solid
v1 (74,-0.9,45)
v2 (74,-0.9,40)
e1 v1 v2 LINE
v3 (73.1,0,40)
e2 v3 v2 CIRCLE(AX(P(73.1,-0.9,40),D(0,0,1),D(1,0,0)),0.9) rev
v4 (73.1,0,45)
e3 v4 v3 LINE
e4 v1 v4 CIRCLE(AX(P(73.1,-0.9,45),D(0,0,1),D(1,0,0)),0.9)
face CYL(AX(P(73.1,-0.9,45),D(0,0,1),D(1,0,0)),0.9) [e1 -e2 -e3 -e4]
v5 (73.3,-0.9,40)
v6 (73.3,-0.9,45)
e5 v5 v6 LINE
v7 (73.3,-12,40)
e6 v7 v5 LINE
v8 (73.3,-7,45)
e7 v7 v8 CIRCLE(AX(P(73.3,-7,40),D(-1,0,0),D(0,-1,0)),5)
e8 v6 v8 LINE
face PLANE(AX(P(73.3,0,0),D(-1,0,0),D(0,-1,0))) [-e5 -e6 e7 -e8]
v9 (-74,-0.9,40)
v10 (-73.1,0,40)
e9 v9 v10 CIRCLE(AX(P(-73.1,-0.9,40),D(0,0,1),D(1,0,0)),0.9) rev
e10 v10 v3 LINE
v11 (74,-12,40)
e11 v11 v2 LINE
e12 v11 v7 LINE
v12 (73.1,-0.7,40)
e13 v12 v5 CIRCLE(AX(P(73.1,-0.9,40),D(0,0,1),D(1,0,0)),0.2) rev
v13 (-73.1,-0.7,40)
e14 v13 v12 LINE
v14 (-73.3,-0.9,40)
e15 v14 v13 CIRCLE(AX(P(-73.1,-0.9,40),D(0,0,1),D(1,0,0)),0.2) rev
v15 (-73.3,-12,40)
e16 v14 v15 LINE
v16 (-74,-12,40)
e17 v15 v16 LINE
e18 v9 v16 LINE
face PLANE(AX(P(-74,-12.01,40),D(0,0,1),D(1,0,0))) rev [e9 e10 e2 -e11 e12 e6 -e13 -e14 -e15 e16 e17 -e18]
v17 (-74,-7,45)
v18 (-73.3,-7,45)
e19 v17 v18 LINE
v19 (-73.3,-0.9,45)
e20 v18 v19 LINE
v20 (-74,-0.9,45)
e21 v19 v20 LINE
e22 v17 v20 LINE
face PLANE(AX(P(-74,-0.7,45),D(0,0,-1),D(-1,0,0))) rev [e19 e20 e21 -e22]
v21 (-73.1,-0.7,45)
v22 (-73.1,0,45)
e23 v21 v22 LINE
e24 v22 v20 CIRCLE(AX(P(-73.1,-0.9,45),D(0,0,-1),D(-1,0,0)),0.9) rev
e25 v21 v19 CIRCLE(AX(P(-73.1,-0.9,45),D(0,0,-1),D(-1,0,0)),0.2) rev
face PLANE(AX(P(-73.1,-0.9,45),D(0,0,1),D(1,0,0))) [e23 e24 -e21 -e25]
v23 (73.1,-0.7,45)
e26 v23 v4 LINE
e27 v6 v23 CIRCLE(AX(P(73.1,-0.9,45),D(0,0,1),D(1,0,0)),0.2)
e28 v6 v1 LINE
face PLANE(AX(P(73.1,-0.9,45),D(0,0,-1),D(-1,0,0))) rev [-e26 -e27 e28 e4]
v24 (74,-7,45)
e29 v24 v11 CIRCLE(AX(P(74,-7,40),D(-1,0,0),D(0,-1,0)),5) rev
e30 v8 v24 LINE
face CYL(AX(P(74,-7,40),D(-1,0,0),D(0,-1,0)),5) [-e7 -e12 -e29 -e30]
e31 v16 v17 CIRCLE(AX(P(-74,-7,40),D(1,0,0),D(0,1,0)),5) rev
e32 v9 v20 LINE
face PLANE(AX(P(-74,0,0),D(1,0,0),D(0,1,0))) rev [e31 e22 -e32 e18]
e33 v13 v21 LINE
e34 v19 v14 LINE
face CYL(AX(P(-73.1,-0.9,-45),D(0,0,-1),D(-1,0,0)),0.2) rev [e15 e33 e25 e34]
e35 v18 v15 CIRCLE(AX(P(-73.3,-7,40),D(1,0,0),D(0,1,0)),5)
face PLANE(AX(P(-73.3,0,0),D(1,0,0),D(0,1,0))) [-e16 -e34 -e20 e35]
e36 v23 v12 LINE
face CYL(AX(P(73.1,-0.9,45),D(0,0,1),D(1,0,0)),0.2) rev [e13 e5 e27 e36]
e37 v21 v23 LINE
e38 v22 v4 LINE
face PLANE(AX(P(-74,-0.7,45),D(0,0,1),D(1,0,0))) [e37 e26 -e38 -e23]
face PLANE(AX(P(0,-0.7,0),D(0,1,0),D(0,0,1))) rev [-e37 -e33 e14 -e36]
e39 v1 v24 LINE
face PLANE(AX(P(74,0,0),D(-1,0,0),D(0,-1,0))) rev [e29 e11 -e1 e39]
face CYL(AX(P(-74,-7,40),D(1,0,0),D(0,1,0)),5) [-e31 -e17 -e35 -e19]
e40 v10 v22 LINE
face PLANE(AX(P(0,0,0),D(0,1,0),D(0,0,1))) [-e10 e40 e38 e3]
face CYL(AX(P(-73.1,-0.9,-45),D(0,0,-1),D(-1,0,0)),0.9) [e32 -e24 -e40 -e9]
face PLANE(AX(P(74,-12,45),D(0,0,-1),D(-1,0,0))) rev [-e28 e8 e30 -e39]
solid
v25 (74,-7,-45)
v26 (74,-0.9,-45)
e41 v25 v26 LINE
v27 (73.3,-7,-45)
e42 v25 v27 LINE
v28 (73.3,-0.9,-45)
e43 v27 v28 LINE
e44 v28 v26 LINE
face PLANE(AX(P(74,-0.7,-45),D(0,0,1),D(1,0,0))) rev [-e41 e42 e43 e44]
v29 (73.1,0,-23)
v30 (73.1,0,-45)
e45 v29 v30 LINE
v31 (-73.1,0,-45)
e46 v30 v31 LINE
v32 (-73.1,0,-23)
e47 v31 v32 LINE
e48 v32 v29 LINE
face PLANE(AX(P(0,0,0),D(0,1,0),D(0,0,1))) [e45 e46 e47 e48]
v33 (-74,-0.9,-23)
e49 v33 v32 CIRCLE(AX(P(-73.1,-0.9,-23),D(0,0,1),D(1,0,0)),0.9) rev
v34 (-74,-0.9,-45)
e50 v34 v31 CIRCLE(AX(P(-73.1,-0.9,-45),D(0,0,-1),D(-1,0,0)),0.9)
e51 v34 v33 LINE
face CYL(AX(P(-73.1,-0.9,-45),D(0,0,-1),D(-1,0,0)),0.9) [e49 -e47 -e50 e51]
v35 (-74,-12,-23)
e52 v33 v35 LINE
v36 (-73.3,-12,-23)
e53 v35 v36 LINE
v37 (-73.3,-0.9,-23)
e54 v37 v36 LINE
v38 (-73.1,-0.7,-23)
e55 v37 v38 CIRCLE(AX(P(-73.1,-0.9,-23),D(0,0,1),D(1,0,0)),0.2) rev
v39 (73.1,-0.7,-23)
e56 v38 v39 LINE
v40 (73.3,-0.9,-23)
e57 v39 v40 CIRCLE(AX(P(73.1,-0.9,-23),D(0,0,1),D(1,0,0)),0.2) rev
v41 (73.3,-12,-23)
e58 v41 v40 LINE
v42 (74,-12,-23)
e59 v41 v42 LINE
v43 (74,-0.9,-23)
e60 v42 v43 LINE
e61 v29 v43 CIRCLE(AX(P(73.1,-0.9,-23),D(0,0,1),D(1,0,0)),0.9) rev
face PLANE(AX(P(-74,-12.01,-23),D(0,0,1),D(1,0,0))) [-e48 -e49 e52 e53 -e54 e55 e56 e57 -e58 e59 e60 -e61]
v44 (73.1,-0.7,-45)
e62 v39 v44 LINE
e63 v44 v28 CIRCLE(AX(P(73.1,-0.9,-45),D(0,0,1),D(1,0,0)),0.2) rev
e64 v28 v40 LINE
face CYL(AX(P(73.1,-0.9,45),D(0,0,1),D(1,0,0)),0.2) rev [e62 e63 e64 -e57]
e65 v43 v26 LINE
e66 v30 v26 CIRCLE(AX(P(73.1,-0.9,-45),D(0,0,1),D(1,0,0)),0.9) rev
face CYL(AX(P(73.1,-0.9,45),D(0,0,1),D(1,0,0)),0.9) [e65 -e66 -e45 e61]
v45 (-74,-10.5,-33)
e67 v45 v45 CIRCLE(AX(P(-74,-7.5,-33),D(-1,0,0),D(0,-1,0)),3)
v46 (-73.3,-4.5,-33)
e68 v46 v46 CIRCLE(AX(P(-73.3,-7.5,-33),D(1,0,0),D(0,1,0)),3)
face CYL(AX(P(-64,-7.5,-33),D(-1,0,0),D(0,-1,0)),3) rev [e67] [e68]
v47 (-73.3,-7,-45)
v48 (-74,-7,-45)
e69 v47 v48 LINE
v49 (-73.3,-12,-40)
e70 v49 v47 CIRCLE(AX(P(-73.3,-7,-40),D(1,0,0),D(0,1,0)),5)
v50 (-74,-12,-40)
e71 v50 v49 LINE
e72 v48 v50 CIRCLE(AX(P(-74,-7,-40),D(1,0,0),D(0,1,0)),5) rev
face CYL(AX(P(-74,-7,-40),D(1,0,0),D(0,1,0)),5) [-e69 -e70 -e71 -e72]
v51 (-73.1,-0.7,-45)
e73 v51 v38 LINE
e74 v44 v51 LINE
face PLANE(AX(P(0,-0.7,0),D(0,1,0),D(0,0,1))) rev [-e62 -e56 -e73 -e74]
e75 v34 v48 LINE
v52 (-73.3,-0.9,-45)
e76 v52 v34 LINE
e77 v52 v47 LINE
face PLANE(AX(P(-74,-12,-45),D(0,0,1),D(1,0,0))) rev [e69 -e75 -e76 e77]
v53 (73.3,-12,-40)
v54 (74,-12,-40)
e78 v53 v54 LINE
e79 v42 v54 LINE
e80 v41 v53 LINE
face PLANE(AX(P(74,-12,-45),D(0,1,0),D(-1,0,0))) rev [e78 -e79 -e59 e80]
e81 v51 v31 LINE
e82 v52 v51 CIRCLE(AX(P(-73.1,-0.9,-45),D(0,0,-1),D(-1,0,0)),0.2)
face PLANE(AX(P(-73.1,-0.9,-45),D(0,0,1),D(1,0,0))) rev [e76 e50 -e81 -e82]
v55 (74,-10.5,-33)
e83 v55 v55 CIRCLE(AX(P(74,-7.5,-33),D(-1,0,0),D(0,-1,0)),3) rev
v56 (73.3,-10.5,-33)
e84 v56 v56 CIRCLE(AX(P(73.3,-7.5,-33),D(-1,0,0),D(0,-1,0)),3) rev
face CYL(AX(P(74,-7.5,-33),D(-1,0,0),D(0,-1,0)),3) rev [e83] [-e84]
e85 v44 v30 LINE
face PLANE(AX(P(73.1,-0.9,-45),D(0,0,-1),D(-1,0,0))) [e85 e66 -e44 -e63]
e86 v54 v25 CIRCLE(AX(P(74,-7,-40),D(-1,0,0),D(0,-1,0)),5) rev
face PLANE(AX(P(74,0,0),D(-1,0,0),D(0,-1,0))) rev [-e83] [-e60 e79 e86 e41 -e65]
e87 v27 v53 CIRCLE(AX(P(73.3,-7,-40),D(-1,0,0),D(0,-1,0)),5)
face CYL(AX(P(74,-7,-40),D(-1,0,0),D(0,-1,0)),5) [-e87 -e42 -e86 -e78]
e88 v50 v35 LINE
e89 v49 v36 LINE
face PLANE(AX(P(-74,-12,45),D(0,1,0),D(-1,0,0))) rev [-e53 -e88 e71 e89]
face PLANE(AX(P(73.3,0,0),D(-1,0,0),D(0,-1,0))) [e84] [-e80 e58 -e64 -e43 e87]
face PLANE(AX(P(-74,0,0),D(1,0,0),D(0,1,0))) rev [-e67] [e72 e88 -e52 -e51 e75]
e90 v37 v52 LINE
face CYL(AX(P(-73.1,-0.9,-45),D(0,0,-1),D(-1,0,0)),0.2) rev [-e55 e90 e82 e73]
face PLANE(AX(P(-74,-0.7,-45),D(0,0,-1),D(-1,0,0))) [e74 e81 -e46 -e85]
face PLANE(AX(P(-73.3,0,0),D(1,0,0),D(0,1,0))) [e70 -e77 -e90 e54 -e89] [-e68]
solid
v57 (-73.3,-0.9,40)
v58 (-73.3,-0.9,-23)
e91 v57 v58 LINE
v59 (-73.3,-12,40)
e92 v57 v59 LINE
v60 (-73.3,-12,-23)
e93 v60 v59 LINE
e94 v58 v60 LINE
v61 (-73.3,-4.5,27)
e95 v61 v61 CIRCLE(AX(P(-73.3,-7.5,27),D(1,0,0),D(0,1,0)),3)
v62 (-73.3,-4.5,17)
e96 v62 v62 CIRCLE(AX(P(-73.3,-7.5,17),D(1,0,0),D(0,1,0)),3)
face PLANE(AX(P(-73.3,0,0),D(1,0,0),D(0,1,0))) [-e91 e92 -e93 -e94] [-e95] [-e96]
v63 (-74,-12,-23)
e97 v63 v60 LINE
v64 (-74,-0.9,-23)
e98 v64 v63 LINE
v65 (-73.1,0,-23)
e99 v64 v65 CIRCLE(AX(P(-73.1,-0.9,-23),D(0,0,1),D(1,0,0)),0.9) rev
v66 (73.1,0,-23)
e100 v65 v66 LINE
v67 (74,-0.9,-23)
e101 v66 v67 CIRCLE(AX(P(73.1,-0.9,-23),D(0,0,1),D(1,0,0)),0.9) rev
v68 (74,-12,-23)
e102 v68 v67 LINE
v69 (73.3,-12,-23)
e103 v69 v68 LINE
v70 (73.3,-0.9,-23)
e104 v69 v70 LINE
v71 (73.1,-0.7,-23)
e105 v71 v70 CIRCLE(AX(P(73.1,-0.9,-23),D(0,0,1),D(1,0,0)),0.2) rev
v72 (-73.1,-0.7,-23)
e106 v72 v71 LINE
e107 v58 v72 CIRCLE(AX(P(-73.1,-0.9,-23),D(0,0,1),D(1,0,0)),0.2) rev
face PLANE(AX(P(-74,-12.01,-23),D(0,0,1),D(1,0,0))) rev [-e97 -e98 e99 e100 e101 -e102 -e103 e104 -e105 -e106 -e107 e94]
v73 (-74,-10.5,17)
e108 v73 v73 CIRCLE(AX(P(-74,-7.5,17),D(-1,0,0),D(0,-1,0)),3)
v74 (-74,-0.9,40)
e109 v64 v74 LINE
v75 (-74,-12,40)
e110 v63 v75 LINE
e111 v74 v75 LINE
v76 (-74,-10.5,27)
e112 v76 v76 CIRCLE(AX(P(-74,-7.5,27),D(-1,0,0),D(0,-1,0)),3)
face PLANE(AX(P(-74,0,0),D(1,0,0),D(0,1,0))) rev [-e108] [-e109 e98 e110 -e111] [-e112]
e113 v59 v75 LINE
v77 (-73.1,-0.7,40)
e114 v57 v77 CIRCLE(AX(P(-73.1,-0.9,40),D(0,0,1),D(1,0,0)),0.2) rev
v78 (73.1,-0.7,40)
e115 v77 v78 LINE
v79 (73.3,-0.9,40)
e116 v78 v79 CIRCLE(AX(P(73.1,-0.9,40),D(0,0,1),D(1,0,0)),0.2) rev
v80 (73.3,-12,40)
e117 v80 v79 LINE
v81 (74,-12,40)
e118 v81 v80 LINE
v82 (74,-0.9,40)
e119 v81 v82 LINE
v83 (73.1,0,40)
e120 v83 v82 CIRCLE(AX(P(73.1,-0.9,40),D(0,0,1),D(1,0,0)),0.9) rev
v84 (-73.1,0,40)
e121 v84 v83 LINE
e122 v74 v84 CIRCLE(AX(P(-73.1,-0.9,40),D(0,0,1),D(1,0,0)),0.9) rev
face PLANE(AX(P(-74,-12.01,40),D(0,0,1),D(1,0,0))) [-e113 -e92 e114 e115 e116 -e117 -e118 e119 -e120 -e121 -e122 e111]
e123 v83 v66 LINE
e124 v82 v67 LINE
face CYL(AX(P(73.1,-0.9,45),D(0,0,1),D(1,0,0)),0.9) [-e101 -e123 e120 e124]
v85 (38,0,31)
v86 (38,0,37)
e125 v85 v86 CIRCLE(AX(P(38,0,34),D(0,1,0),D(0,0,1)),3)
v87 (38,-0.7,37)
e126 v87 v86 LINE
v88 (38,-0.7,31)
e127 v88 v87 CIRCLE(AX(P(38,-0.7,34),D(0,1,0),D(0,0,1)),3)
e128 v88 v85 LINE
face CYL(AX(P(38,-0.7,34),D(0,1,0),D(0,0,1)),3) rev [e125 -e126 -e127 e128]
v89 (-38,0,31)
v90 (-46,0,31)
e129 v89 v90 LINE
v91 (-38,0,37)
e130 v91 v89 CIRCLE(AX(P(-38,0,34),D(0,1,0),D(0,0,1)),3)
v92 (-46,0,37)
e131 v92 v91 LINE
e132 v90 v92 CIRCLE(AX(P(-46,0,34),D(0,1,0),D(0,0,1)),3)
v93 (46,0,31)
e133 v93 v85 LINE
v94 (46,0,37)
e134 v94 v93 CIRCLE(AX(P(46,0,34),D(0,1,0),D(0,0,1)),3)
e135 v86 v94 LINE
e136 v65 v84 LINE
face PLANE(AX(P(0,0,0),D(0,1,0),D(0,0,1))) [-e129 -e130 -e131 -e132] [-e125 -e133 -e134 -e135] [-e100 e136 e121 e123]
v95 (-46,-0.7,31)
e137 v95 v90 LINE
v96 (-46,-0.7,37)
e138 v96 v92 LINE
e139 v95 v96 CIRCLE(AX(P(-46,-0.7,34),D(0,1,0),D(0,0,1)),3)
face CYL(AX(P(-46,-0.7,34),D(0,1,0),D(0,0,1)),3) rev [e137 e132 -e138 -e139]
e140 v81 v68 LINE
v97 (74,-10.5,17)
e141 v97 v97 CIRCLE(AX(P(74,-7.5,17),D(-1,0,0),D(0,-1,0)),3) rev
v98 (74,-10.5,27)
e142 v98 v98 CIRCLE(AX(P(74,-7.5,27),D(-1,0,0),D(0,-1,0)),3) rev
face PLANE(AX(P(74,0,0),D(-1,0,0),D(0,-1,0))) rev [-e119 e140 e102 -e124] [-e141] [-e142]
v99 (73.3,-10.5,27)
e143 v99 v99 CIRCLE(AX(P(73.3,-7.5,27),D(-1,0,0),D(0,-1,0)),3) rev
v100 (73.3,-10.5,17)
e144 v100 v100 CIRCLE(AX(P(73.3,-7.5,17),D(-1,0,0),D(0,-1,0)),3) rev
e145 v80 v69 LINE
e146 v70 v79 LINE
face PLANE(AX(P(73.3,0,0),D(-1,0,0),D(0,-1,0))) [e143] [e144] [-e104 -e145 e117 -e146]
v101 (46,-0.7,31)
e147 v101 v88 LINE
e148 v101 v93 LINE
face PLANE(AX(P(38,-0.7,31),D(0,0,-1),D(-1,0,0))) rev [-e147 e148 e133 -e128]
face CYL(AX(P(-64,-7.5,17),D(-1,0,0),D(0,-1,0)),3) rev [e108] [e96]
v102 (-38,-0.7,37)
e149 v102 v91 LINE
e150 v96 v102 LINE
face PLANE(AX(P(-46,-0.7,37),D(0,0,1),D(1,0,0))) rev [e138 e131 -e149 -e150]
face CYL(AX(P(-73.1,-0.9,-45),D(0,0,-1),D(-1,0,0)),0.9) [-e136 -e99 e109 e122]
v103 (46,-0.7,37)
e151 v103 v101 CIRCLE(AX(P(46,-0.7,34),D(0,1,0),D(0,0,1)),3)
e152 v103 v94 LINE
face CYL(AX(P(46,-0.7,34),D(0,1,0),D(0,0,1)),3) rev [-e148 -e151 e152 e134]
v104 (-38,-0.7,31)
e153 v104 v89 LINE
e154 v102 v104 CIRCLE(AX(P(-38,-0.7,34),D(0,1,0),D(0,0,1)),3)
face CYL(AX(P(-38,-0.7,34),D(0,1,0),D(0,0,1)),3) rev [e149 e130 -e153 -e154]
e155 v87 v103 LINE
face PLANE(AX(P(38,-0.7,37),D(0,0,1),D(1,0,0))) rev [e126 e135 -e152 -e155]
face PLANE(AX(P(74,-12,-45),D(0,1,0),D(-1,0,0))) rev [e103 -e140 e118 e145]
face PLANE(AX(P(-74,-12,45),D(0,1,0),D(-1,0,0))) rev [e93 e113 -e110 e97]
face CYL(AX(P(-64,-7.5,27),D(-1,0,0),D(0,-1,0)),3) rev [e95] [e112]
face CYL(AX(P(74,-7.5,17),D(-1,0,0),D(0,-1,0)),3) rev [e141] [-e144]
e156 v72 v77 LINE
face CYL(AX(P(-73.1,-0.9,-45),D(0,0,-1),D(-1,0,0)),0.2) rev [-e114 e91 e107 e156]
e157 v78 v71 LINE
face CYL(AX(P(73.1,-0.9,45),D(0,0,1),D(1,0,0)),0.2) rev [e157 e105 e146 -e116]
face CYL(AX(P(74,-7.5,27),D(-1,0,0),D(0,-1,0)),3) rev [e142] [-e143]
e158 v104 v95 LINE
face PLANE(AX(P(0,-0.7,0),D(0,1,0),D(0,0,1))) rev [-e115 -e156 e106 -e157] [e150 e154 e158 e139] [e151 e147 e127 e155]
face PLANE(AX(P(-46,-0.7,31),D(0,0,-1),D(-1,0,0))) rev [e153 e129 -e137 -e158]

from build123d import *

# Parameters (mm, degrees)
SKETCH_1_W                         = 148
SKETCH_1_H                         = 90
SM_BASE_FLANGE_1_DEPTH             = 0.7
SM_EDGE_FLANGE_1_STRIP_W           = 3.2
SM_EDGE_FLANGE_1_STRIP_H           = 0.7
SM_EDGE_FLANGE_1_STRIP_CUT_DEPTH   = 90
SM_EDGE_FLANGE_1_STRIP_2_W         = 3.2
SM_EDGE_FLANGE_1_STRIP_2_H         = 0.7
SM_EDGE_FLANGE_1_STRIP_CUT_2_DEPTH = 90
SM_EDGE_FLANGE_1_DEPTH             = 90
SM_EDGE_FLANGE_1_PROFILE_W         = 90
SM_EDGE_FLANGE_1_PROFILE_H         = 11.1
SM_EDGE_FLANGE_1_PROFILE_R         = 3
SM_EDGE_FLANGE_1_FLAT_DEPTH        = 0.7
SM_EDGE_FLANGE_1_BEND_DEPTH        = 90
FILLET_2_R                         = 5
CUT_EXTRUDE_START                  = -10
SKETCH_15_R                        = 3
CUT_EXTRUDE_1_DEPTH                = 10
SPLIT_BODIES_1_SURFACE_1_1_BACK    = 174.632
SPLIT_BODIES_1_SURFACE_1_1_DEPTH   = 349.264
SPLIT_BODIES_1_SURFACE_1_2_BACK    = 174.632
SPLIT_BODIES_1_SURFACE_1_2_DEPTH   = 349.264
SPLIT_BODIES_1_SURFACE_2_3_BACK    = 174.632
SPLIT_BODIES_1_SURFACE_2_3_DEPTH   = 349.264
SPLIT_BODIES_1_SURFACE_2_4_BACK    = 174.632
SPLIT_BODIES_1_SURFACE_2_4_DEPTH   = 349.264


# Sheet-metal steps are written as plain solids
with BuildPart() as part:
    # Sketch 1 → 基体-法兰1 (new body)
    with BuildSketch(Plane(origin=(0, 0, 0), x_dir=(1, 0, 0), z_dir=(0, 1, 0))):
        Rectangle(SKETCH_1_W, SKETCH_1_H)
        with BuildLine():
            Line((-46, -31), (-38, -31))
            ThreePointArc((-38, -31), (-35, -34), (-38, -37))
            Line((-38, -37), (-46, -37))
            ThreePointArc((-46, -37), (-49, -34), (-46, -31))
        make_face(mode=Mode.SUBTRACT)
        with BuildLine():
            Line((38, -31), (46, -31))
            ThreePointArc((46, -31), (49, -34), (46, -37))
            Line((46, -37), (38, -37))
            ThreePointArc((38, -37), (35, -34), (38, -31))
        make_face(mode=Mode.SUBTRACT)
    extrude(amount=-SM_BASE_FLANGE_1_DEPTH)

    # 边线-法兰1 strip (across the edge) → 边线-法兰1 strip cut (cut)
    with BuildSketch(Plane(origin=(74, -0.7, -45), x_dir=(-1, 0, 0), z_dir=(0, 0, 1))):
        with Locations((-0.7, -0.35)):
            Rectangle(SM_EDGE_FLANGE_1_STRIP_W, SM_EDGE_FLANGE_1_STRIP_H)
    extrude(amount=SM_EDGE_FLANGE_1_STRIP_CUT_DEPTH, mode=Mode.SUBTRACT)

    # 边线-法兰1 strip 2 (across the edge) → 边线-法兰1 strip cut 2 (cut)
    with BuildSketch(Plane(origin=(-74, -0.7, 45), x_dir=(1, 0, 0), z_dir=(0, 0, -1))):
        with Locations((-0.7, -0.35)):
            Rectangle(SM_EDGE_FLANGE_1_STRIP_2_W, SM_EDGE_FLANGE_1_STRIP_2_H)
    extrude(amount=SM_EDGE_FLANGE_1_STRIP_CUT_2_DEPTH, mode=Mode.SUBTRACT)

    # 边线-法兰1 bend section (across the edge) → 边线-法兰1 (add)
    with BuildSketch(Plane(origin=(74, -0.7, -45), x_dir=(-1, 0, 0), z_dir=(0, 0, 1))):
        with BuildLine():
            Line((0, 0.2), (0.7, 0.2))
            ThreePointArc((0.7, 0.2), (0.758578644, 0.058578644), (0.9, 0))
            Line((0.9, 0), (0.9, -0.7))
            ThreePointArc((0.9, -0.7), (0.263603897, -0.436396103), (0, 0.2))
        make_face()
    extrude(amount=SM_EDGE_FLANGE_1_DEPTH)

    # 边线-法兰1 profile (on flange) → 边线-法兰1 flat (add)
    with BuildSketch(Plane(origin=(74, -0.7, 0), x_dir=(0, 0, 1), z_dir=(1, 0, 0))):
        with Locations((0, 5.75)):
            Rectangle(SM_EDGE_FLANGE_1_PROFILE_W, SM_EDGE_FLANGE_1_PROFILE_H)
        with Locations((17, 6.8)):
            Circle(SM_EDGE_FLANGE_1_PROFILE_R, mode=Mode.SUBTRACT)
        with Locations((27, 6.8)):
            Circle(SM_EDGE_FLANGE_1_PROFILE_R, mode=Mode.SUBTRACT)
        with Locations((-33, 6.8)):
            Circle(SM_EDGE_FLANGE_1_PROFILE_R, mode=Mode.SUBTRACT)
    extrude(amount=-SM_EDGE_FLANGE_1_FLAT_DEPTH)

    # 边线-法兰1 section (across the edge) → 边线-法兰1 bend (add)
    with BuildSketch(Plane(origin=(-74, -0.7, 45), x_dir=(1, 0, 0), z_dir=(0, 0, -1))):
        with BuildLine():
            Line((0, 0.2), (0, 11.3))
            Line((0, 11.3), (0.7, 11.3))
            Line((0.7, 11.3), (0.7, 0.2))
            ThreePointArc((0.7, 0.2), (0.758578644, 0.058578644), (0.9, 0))
            Line((0.9, 0), (0.9, -0.7))
            ThreePointArc((0.9, -0.7), (0.263603897, -0.436396103), (0, 0.2))
        make_face()
    extrude(amount=SM_EDGE_FLANGE_1_BEND_DEPTH)

    # 圆角2
    fillet_2_edges = [part.edges().sort_by_distance(p)[0] for p in [
        (-73.65, -12, 45),
        (-73.65, -12, -45),
        (73.65, -12, -45),
        (73.65, -12, 45),
    ]]
    fillet(fillet_2_edges, radius=FILLET_2_R)

    # 草图15 → 切除-拉伸1 (cut)
    with BuildSketch(Plane.ZY.offset(74).offset(CUT_EXTRUDE_START)):
        with Locations(Location((-33, -7.5, 0), (0, 0, 270))):
            Circle(SKETCH_15_R)
        with Locations(Location((17, -7.5, 0), (0, 0, 270))):
            Circle(SKETCH_15_R)
        with Locations(Location((27, -7.5, 0), (0, 0, 270))):
            Circle(SKETCH_15_R)
    extrude(amount=CUT_EXTRUDE_1_DEPTH, mode=Mode.SUBTRACT)


with BuildPart() as body_2:
    # Split Bodies 1: the piece behind the surface
    add(part.part)
    # Split Bodies 1 surface 1: a surface, the sketch's curves swept straight by 349.264 mm
    with BuildLine(Plane(origin=(0, 0, 0), x_dir=(1, 0, 0), z_dir=(0, 1, 0)).offset(-SPLIT_BODIES_1_SURFACE_1_1_BACK), mode=Mode.PRIVATE) as split_bodies_1_surface_1_1_path:
        Line((-74, 23), (74, 23))
    split_bodies_1_surface_1_1 = Shell.extrude(split_bodies_1_surface_1_1_path.wire(), (0 * SPLIT_BODIES_1_SURFACE_1_1_DEPTH, 1 * SPLIT_BODIES_1_SURFACE_1_1_DEPTH, 0 * SPLIT_BODIES_1_SURFACE_1_1_DEPTH))
    split(bisect_by=split_bodies_1_surface_1_1, keep=Keep.BOTTOM)


with BuildPart() as part_1:
    add(part.part)

    # Split Bodies 1: split by a surface, the side it looks to stays
    # Split Bodies 1 surface 1: a surface, the sketch's curves swept straight by 349.264 mm
    with BuildLine(Plane(origin=(0, 0, 0), x_dir=(1, 0, 0), z_dir=(0, 1, 0)).offset(-SPLIT_BODIES_1_SURFACE_1_2_BACK), mode=Mode.PRIVATE) as split_bodies_1_surface_1_2_path:
        Line((-74, 23), (74, 23))
    split_bodies_1_surface_1_2 = Shell.extrude(split_bodies_1_surface_1_2_path.wire(), (0 * SPLIT_BODIES_1_SURFACE_1_2_DEPTH, 1 * SPLIT_BODIES_1_SURFACE_1_2_DEPTH, 0 * SPLIT_BODIES_1_SURFACE_1_2_DEPTH))
    split(bisect_by=split_bodies_1_surface_1_2, keep=Keep.TOP)


with BuildPart() as body_3:
    # Split Bodies 1 2 body 2: the piece behind the surface
    add(body_2.part)
    # Split Bodies 1 surface 2: a surface, the sketch's curves swept straight by 349.264 mm
    with BuildLine(Plane(origin=(0, 0, 0), x_dir=(1, 0, 0), z_dir=(0, 1, 0)).offset(-SPLIT_BODIES_1_SURFACE_2_3_BACK), mode=Mode.PRIVATE) as split_bodies_1_surface_2_3_path:
        Line((-74, -40), (74, -40))
    split_bodies_1_surface_2_3 = Shell.extrude(split_bodies_1_surface_2_3_path.wire(), (0 * SPLIT_BODIES_1_SURFACE_2_3_DEPTH, 1 * SPLIT_BODIES_1_SURFACE_2_3_DEPTH, 0 * SPLIT_BODIES_1_SURFACE_2_3_DEPTH))
    split(bisect_by=split_bodies_1_surface_2_3, keep=Keep.BOTTOM)


with BuildPart() as body_2_1:
    add(body_2.part)

    # Split Bodies 1 2 body 2: split by a surface, the side it looks to stays
    # Split Bodies 1 surface 2: a surface, the sketch's curves swept straight by 349.264 mm
    with BuildLine(Plane(origin=(0, 0, 0), x_dir=(1, 0, 0), z_dir=(0, 1, 0)).offset(-SPLIT_BODIES_1_SURFACE_2_4_BACK), mode=Mode.PRIVATE) as split_bodies_1_surface_2_4_path:
        Line((-74, -40), (74, -40))
    split_bodies_1_surface_2_4 = Shell.extrude(split_bodies_1_surface_2_4_path.wire(), (0 * SPLIT_BODIES_1_SURFACE_2_4_DEPTH, 1 * SPLIT_BODIES_1_SURFACE_2_4_DEPTH, 0 * SPLIT_BODIES_1_SURFACE_2_4_DEPTH))
    split(bisect_by=split_bodies_1_surface_2_4, keep=Keep.TOP)


solid = Compound([part_1.part, body_3.part, body_2_1.part])
